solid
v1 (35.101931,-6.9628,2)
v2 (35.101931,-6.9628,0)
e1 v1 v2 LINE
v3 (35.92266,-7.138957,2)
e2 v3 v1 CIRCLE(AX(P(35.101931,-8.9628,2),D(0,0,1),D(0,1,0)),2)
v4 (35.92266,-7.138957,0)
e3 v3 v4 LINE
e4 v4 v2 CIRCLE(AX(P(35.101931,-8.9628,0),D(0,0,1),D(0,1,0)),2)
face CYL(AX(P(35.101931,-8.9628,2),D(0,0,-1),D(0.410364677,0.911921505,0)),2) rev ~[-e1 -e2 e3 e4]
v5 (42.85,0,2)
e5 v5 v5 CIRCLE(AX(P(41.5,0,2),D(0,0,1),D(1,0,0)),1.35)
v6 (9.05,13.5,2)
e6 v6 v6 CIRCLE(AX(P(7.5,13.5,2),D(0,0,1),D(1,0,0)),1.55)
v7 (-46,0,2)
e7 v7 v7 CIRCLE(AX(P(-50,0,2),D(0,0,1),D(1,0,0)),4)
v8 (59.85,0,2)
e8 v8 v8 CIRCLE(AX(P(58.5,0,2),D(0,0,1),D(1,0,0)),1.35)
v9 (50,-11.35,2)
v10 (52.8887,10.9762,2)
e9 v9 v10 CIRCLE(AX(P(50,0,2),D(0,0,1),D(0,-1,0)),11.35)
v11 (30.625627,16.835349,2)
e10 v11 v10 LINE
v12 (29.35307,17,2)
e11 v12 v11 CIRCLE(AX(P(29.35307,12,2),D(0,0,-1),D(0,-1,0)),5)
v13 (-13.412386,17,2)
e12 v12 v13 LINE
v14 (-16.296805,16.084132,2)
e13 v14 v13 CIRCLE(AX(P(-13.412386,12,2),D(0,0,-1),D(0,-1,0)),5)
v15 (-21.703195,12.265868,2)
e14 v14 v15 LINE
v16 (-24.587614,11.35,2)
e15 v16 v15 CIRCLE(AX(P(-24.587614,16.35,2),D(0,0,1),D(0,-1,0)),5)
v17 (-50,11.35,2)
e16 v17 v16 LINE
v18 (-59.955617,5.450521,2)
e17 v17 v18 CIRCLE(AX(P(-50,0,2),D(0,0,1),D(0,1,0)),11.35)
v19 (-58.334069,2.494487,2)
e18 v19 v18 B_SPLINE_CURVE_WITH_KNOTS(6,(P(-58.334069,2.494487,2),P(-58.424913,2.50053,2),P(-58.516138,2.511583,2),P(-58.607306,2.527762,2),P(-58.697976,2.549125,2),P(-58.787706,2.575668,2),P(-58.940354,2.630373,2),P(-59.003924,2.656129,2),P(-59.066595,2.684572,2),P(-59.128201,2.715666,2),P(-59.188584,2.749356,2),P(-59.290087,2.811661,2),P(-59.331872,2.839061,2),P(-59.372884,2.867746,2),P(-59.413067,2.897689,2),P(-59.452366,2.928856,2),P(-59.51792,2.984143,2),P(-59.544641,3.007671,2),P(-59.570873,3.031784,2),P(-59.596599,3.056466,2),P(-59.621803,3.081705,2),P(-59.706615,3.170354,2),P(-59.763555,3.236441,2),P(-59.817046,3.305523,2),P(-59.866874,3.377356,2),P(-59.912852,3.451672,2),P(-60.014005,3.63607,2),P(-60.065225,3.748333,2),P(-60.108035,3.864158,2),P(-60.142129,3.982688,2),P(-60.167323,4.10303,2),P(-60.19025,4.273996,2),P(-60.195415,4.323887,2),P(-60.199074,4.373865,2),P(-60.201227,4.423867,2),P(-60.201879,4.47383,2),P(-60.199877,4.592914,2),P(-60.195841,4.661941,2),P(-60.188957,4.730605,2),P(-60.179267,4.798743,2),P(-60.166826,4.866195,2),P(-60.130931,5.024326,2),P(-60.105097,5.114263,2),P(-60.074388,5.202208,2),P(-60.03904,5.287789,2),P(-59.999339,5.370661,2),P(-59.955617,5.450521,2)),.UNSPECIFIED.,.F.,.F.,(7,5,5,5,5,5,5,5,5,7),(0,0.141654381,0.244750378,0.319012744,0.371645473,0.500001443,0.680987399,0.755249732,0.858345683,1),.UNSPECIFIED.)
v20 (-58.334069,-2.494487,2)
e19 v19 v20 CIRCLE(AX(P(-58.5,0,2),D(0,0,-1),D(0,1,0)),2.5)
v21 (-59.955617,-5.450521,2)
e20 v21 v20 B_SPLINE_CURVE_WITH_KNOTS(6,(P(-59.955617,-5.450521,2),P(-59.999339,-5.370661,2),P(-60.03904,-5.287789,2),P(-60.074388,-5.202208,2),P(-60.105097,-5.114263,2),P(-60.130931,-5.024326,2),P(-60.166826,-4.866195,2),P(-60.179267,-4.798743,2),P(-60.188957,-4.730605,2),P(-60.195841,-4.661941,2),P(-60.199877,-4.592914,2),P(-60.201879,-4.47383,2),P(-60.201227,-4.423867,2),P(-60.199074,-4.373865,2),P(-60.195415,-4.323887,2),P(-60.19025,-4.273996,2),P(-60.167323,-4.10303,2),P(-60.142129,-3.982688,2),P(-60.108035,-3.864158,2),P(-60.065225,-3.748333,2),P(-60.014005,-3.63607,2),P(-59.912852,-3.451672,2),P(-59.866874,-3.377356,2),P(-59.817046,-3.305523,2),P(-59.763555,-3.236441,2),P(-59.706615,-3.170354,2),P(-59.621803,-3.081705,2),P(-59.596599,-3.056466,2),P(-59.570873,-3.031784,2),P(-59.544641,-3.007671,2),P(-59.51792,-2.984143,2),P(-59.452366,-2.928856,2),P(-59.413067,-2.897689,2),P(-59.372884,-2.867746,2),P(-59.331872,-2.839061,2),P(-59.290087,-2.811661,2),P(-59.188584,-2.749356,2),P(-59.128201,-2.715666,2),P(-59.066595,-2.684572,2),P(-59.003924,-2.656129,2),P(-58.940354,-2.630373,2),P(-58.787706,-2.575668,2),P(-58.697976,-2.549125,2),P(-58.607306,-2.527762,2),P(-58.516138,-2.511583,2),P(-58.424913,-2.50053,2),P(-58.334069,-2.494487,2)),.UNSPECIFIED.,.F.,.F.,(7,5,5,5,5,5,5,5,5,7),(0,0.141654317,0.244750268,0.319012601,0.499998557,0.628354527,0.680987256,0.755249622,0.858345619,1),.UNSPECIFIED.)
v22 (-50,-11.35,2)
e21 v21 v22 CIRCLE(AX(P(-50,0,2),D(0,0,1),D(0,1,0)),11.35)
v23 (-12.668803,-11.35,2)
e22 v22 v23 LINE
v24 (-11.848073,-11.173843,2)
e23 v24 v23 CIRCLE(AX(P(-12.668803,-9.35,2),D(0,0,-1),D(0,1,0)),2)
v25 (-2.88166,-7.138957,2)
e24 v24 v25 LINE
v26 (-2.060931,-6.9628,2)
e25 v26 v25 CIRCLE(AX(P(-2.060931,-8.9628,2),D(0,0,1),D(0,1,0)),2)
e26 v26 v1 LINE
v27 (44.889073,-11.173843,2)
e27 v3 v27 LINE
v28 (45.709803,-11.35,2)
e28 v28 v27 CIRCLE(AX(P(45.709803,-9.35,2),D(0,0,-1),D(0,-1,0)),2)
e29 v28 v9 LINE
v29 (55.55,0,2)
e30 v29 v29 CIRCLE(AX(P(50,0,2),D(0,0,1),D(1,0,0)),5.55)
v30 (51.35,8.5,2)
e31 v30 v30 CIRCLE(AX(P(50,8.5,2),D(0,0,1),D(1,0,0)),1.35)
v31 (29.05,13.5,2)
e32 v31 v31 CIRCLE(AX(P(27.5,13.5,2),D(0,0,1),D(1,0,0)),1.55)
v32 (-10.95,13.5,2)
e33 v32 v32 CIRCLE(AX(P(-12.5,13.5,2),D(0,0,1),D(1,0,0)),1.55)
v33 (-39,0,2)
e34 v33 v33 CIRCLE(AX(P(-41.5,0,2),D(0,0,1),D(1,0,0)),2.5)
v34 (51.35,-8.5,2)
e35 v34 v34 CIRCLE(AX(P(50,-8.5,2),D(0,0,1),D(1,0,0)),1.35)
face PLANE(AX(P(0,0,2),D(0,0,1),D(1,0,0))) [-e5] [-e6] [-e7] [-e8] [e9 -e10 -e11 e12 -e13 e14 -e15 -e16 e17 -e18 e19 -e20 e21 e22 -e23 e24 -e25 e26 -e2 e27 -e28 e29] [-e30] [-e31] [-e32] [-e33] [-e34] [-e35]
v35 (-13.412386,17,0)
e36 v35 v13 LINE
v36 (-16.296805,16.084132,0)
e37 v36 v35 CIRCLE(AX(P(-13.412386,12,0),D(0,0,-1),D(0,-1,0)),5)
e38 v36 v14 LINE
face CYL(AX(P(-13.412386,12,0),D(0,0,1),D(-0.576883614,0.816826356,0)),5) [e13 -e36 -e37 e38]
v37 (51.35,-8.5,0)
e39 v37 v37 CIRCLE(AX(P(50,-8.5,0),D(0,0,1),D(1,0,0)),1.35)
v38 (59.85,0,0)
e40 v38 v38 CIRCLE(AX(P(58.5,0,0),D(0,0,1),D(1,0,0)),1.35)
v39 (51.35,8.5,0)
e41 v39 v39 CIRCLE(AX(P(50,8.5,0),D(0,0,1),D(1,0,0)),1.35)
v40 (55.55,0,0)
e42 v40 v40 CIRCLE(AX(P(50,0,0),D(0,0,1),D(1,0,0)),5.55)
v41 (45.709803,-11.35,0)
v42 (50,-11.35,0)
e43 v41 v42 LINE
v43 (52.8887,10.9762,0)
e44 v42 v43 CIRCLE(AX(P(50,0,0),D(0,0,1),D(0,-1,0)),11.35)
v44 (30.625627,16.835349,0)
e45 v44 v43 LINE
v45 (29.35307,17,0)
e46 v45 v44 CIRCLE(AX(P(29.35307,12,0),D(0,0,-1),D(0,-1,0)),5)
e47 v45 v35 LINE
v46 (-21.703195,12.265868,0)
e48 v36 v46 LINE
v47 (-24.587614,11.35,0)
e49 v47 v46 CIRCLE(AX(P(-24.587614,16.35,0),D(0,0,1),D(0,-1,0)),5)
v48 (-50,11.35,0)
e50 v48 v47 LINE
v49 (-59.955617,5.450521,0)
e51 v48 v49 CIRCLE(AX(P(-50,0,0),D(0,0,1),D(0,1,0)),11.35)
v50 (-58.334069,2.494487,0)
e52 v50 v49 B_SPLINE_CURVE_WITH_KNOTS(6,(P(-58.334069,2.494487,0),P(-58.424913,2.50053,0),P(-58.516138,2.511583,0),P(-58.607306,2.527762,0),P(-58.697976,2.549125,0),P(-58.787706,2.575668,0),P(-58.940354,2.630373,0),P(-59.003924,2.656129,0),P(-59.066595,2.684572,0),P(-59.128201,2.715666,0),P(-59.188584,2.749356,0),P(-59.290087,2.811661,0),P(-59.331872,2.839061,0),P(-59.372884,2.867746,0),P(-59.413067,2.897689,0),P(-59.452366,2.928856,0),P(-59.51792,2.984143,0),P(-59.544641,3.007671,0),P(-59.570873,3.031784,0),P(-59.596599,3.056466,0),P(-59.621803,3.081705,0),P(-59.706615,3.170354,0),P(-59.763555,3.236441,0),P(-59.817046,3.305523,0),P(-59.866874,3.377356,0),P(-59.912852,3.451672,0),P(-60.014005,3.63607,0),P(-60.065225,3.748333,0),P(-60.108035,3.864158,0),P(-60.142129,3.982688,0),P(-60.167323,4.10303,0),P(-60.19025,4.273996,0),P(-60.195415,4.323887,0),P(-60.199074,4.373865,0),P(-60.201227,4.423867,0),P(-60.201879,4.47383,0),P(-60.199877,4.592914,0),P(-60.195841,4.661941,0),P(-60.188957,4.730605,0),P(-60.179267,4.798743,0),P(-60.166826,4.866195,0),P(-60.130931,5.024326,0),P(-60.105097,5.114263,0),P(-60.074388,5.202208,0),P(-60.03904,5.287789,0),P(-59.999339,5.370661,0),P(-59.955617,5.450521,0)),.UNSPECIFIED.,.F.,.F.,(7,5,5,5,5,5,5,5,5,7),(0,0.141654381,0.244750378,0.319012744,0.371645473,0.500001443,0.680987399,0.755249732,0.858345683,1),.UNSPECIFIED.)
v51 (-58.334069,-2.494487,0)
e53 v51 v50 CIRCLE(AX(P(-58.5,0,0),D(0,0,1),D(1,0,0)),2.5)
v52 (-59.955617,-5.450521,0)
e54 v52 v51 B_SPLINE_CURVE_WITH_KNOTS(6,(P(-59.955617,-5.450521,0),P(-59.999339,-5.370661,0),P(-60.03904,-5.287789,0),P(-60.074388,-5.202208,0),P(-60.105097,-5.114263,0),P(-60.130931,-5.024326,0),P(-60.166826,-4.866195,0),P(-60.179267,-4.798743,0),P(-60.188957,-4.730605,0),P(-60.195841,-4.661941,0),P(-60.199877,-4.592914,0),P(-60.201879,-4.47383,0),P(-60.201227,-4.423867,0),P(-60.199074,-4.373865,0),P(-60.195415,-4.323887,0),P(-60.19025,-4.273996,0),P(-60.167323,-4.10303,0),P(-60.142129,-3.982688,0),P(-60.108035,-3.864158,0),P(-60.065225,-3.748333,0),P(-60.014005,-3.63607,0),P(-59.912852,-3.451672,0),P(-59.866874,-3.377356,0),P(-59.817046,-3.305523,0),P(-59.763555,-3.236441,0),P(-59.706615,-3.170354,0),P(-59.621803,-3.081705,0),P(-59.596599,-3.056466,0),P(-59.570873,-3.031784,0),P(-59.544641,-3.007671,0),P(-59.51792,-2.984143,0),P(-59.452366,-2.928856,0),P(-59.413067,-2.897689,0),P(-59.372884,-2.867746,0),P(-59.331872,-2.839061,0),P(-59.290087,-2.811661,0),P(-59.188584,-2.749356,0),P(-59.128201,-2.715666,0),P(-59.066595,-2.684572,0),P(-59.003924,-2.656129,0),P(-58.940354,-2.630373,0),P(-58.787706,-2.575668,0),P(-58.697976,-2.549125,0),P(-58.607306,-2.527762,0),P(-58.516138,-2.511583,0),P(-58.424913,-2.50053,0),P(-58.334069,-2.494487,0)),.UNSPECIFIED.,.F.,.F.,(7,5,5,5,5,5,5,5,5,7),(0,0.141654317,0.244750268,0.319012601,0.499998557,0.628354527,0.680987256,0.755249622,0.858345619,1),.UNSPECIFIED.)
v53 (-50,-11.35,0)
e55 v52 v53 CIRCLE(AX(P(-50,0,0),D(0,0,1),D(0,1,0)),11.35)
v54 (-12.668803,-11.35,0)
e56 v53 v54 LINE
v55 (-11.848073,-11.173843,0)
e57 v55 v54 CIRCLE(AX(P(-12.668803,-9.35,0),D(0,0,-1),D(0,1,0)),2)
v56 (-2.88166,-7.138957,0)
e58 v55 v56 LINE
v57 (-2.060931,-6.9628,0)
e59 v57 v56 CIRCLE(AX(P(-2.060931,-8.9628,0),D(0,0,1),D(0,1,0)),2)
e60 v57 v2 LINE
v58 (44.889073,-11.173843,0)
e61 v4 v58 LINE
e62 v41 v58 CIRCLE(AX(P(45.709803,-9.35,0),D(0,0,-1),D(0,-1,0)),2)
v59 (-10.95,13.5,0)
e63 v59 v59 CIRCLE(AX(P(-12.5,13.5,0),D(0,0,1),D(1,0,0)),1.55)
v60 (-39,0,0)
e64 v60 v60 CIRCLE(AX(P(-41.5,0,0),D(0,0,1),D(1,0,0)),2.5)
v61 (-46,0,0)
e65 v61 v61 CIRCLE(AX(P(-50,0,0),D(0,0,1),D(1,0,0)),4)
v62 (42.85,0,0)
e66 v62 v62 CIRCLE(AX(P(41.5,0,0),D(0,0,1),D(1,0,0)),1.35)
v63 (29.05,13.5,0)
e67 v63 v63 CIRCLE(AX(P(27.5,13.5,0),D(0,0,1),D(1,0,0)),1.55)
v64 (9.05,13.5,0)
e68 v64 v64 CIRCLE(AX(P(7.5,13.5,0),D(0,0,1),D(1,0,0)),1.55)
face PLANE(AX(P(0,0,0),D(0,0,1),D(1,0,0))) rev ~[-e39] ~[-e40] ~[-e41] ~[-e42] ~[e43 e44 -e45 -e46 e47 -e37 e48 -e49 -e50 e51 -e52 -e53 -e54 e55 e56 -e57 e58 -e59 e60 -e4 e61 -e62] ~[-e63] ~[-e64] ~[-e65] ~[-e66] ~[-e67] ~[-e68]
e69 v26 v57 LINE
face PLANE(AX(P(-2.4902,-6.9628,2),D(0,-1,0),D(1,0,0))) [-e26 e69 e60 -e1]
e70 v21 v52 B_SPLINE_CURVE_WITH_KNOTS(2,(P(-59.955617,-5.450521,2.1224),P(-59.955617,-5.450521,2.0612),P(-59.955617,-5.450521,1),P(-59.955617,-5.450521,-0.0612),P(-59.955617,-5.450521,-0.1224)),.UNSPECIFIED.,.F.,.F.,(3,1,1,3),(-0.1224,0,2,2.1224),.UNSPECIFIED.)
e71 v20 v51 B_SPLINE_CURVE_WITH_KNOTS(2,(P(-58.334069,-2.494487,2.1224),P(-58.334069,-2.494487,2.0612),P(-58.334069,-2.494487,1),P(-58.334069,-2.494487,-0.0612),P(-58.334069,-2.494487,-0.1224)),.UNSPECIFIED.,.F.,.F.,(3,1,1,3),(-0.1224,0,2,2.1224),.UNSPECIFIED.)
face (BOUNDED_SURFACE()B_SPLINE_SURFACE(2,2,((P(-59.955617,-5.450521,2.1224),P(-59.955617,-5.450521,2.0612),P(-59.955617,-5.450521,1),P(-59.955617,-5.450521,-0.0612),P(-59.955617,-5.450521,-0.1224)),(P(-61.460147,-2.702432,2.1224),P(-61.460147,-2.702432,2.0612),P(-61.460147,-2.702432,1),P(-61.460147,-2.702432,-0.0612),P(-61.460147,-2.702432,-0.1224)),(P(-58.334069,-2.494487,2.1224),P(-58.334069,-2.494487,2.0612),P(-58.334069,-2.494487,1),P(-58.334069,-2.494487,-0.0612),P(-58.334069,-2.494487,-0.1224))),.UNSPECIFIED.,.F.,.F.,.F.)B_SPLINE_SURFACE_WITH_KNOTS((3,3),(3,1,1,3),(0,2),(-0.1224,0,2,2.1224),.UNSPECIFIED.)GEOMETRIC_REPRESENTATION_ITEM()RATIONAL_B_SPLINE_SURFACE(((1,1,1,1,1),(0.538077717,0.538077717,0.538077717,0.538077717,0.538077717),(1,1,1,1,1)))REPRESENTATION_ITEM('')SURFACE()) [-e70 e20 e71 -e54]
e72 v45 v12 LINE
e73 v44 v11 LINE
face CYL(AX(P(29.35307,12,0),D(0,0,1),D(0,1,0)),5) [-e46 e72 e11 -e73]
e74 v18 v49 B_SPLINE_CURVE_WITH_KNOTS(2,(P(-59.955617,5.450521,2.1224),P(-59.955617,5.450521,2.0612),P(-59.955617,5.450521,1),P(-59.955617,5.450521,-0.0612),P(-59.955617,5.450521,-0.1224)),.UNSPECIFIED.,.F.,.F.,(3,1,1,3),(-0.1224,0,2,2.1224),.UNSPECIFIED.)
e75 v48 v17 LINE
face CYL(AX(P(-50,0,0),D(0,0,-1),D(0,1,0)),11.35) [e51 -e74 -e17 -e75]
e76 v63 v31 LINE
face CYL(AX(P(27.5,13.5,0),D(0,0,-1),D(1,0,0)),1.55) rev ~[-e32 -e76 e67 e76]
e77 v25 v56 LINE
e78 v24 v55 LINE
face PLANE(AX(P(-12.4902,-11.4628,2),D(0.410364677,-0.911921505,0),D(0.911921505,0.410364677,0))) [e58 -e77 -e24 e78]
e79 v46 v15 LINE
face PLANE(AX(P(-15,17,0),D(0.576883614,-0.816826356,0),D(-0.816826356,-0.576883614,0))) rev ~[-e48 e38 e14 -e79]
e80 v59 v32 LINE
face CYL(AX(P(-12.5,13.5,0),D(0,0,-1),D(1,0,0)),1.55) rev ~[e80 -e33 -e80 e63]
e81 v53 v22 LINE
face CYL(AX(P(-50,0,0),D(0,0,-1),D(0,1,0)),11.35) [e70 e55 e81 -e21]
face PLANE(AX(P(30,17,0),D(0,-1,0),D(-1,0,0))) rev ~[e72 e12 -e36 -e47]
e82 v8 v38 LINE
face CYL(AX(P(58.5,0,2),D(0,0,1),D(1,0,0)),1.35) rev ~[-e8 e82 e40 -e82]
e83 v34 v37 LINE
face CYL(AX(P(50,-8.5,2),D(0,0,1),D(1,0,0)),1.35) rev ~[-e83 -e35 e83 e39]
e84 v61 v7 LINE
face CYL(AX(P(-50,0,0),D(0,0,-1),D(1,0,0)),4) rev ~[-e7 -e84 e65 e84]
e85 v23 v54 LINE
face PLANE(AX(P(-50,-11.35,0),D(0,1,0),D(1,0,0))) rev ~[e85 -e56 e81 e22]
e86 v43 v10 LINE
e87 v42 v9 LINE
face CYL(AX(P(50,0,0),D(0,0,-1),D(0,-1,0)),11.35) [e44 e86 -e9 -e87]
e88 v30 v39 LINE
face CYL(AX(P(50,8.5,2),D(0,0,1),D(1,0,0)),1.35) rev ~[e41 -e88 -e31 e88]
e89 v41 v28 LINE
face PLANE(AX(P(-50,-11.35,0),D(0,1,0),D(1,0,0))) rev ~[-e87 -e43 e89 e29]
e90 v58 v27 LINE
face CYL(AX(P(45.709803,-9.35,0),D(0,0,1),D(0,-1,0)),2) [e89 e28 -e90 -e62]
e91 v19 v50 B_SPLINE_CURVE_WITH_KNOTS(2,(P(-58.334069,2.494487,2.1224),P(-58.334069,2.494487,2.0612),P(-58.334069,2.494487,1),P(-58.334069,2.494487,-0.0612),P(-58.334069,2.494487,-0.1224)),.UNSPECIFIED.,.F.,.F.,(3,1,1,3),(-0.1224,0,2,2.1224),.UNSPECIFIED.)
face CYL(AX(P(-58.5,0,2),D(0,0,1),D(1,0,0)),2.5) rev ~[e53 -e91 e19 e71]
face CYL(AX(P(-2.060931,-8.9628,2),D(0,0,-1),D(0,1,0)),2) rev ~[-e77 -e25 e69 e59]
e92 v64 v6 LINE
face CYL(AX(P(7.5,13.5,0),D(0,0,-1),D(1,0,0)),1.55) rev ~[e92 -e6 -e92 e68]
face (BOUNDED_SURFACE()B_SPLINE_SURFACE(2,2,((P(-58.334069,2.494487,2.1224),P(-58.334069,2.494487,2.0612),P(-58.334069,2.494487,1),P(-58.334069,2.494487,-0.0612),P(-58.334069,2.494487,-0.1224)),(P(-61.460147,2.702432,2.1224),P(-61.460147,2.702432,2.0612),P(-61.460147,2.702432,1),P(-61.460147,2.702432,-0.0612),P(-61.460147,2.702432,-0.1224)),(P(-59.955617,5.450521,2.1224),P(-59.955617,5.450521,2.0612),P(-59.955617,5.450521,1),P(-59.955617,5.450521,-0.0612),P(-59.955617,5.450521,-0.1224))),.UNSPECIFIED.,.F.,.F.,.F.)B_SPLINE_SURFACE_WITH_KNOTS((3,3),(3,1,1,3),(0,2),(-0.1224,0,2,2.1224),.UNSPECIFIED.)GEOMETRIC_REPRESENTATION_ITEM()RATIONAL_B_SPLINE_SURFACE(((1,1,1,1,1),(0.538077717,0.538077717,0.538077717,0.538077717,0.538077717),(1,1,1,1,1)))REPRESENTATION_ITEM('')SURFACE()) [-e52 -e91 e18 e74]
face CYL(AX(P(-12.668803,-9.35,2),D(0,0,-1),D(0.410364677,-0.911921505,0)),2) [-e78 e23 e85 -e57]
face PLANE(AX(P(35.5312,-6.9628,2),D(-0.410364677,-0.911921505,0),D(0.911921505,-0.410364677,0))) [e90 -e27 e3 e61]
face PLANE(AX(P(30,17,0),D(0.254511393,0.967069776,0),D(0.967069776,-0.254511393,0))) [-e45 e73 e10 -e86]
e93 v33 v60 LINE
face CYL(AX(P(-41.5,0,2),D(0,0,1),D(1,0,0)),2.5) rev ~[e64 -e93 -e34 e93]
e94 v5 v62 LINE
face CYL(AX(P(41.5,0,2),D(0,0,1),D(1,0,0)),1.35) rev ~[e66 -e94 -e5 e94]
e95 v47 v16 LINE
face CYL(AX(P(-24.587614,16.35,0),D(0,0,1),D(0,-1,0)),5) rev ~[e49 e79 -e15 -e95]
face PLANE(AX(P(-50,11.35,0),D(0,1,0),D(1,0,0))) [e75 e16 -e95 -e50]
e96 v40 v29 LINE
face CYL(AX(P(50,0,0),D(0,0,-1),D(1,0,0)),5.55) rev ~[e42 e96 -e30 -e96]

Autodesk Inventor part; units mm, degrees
ref_plane "YZ Plane" through (0, 0, 0) normal (1, 0, 0) x (0, 1, 0)
ref_plane "XZ Plane" through (0, 0, 0) normal (0, 1, 0) x (-1, 0, 0)
ref_plane "XY Plane" through (0, 0, 0) normal (0, 0, 1) x (1, 0, 0)
sketch "スケッチ1" plane through (0, 0, 0) normal (0, 0, 1) x (1, 0, 0)
  line L0 (-50, 0) -> (50, 0) construction
  circle A0 centre (-50, 0) radius 4
  circle A1 centre (50, 0) radius 5.55
  line L1 (-50, 11.35) -> (-23, 11.35)
  line L2 (-50, -11.35) -> (50, -11.35)
  arc A2 (50, -11.35) -> (50, 11.35) centre (50, 0) ccw
  line L3 (30, 17) -> (-15, 17)
  line L4 (-15, 17) -> (-23, 11.35)
  line L5 (-24.9115, 10) -> (41.8474, 10) construction
  line L6 (-15, 17) -> (-15, 10) construction
  line L7 (30, 17) -> (30, 10) construction
  circle A3 centre (27.5, 13.5) radius 1.55
  circle A4 centre (-12.5, 13.5) radius 1.55
  circle A5 centre (7.5, 13.5) radius 1.55
  line L8 (-15, 13.5) -> (30, 13.5) construction
  line L9 (30, 16) -> (-15, 16) construction
  line L10 (-15, 16) -> (-15, 11) construction
  line L11 (-15, 11) -> (30, 11) construction
  line L12 (30, 11) -> (30, 16) construction
  line L13 (-23, 11.35) -> (50, 11.35)
  arc A6 (-50, 11.35) -> (-50, -11.35) centre (-50, 0) ccw
  line L14 (7.5, 17) -> (7.5, 10.5172) construction
  line L15 (30, 17) -> (52.8887, 10.9762)
  point P0 (0, 0)
  point P1 (0, 0)
  point P2 (55.7736, 9.7718)
  point P3 (38, 11.35)
  dimension "d0" = 100
  dimension "d1" = 8
  dimension "d8" = 11.1
  dimension "d10" = 7
  dimension "d11" = 45
  dimension "d12" = 2.5
  dimension "d13" = 3.1
  dimension "d14" = 2.5
  dimension "d15" = 20
  dimension "d17" = 5
  dimension "d18" = 11
  dimension "d69" = 11.35
  dimension "d72" = 11.35
  dimension "d87" = 8
  dimension "d88" = 8
extrude "押し出し1" add sketch "スケッチ1" along normal blind 2
fillet "フィレット1" radius 5 4 edges at (-23, 11.35, 1) (-15, 17, 1) (30, 17, 1) (-50, 11.35, 1)
sketch "スケッチ2" plane through (0, 0, 2) normal (0, 0, 1) x (1, 0, 0)
  arc A0 (50, -11.35) -> (52.8887, 10.9762) centre (50, 0) ccw projected
  line L0 (18, -20) -> (-35.4549, -20) construction
  line L1 (-76.9372, -11.5) -> (-72, -11.5)
  line L2 (-76.9372, -12.4) -> (-76.9372, -11.5)
  line L3 (-71.9872, -11.45) -> (-76.9872, -11.45)
  line L4 (-76.9872, -11.45) -> (-76.9872, -12.45)
  circle A1 centre (-50, 0) radius 4 projected
  circle A2 centre (-50, 0) radius 5.5 construction
  circle A3 centre (50, 0) radius 5.55 projected
  line L5 (83.3205, -17.7128) -> (50, 0) construction
  line L6 (50, 0) -> (18, -20) construction
  line L7 (83.3205, -17.7128) -> (37.8533, -17.7128) construction
  line L8 (-13.4166, -12.4128) -> (46.4577, -12.4128)
  line L9 (46.4577, -12.4128) -> (46.4577, -11.5128)
  line L10 (46.4577, -11.5128) -> (45.5205, -11.5128)
  line L11 (45.5205, -11.5128) -> (35.5205, -7.0128)
  line L12 (35.5205, -7.0128) -> (-2.4795, -7.0128)
  line L13 (-2.4795, -7.0128) -> (-12.4795, -11.5128)
  line L14 (-12.4795, -11.5128) -> (-13.4166, -11.5128)
  line L15 (-13.4166, -11.5128) -> (-13.4166, -12.4128)
  line L16 (-12.4902, -11.4628) -> (-2.4902, -6.9628)
  line L17 (-2.4902, -6.9628) -> (35.5312, -6.9628)
  line L18 (35.5312, -6.9628) -> (45.5312, -11.4628)
  line L19 (45.5312, -11.4628) -> (46.5077, -11.4628)
  line L20 (46.5077, -11.4628) -> (46.5077, -12.4628)
  line L21 (46.5077, -12.4628) -> (-13.4666, -12.4628)
  line L22 (-13.4666, -12.4628) -> (-13.4666, -11.4628)
  line L23 (-13.4666, -11.4628) -> (-12.4902, -11.4628)
  point P0 (56.6914, 9.1677)
  point P1 (0, 0)
  point P2 (50, 11.35)
  dimension "d19" = 20
  dimension "d20" = 32
  dimension "d32" = 11
  dimension "d33" = 120
  dimension "d37" = 37.8
  dimension "d38" = 6.2
  dimension "d39" = 0.05
  dimension "d49" = 38
  dimension "d50" = 10
  dimension "d51" = 10
  dimension "d52" = 4.5
  dimension "d53" = 0.9
  dimension "d54" = 59.9743
extrude "押し出し2" cut sketch "スケッチ2" against normal blind 10 contours L15 L14 L13 L12 L11 L10 L9 L8 | L16 L17 L18 L19 L20 L21 L22 L23
fillet "フィレット2" radius 2 4 edges at (45.2805, -11.35, 1) (-12.2395, -11.35, 1) (35.5312, -6.9628, 1) (-2.4902, -6.9628, 1)
sketch "スケッチ4" plane through (0, 0, 2) normal (0, 0, 1) x (1, 0, 0)
  circle A0 centre (50, 0) radius 5.55 projected
  circle A1 centre (50, 0) radius 8.5 construction
  line L0 (50, 0) -> (50, 8.5) construction
  circle A2 centre (50, 8.5) radius 1.35
  circle A3 centre (41.5, 0) radius 1.35
  circle A4 centre (50, -8.5) radius 1.35
  circle A5 centre (58.5, 0) radius 1.35
  point P0 (0, 0)
  dimension "d61" = 17
  dimension "d62" = 2.7
  dimension "d65" = 360
extrude "押し出し4" cut sketch "スケッチ4" against normal through all contours A2 | A3 | A4 | A5
sketch "スケッチ6" plane through (0, 0, 2) normal (0, 0, 1) x (1, 0, 0)
  circle A0 centre (-50, 0) radius 4 projected
  circle A1 centre (-50, 0) radius 8.5 construction
  circle A2 centre (-58.5, 0) radius 2.5
  line L0 (-50, 0) -> (-58.5, 0) construction
  line L1 (-50, 0) -> (-41.5, 0) construction
  circle A3 centre (-41.5, 0) radius 2.5
  arc A4 (-50, 11.35) -> (-50, -11.35) centre (-50, 0) ccw projected
  line L2 (-58.5, -2.5) -> (-61.0712, -2.5)
  line L3 (-58.5, 2.5) -> (-61.0712, 2.5)
  point P0 (0, 0)
  dimension "d78" = 17
  dimension "d79" = 5
  dimension "d82" = 360
extrude "押し出し6" cut sketch "スケッチ6" against normal through all contours A2 | A2 L2 A4 L3 | A3
fillet "フィレット4" radius 2 2 edges at (-61.0712, 2.5, 1) (-61.0712, -2.5, 1)
equation "\"d14\" = d12"
properties part number "リンク_メインフレーム_6_4" material "GFRP"
